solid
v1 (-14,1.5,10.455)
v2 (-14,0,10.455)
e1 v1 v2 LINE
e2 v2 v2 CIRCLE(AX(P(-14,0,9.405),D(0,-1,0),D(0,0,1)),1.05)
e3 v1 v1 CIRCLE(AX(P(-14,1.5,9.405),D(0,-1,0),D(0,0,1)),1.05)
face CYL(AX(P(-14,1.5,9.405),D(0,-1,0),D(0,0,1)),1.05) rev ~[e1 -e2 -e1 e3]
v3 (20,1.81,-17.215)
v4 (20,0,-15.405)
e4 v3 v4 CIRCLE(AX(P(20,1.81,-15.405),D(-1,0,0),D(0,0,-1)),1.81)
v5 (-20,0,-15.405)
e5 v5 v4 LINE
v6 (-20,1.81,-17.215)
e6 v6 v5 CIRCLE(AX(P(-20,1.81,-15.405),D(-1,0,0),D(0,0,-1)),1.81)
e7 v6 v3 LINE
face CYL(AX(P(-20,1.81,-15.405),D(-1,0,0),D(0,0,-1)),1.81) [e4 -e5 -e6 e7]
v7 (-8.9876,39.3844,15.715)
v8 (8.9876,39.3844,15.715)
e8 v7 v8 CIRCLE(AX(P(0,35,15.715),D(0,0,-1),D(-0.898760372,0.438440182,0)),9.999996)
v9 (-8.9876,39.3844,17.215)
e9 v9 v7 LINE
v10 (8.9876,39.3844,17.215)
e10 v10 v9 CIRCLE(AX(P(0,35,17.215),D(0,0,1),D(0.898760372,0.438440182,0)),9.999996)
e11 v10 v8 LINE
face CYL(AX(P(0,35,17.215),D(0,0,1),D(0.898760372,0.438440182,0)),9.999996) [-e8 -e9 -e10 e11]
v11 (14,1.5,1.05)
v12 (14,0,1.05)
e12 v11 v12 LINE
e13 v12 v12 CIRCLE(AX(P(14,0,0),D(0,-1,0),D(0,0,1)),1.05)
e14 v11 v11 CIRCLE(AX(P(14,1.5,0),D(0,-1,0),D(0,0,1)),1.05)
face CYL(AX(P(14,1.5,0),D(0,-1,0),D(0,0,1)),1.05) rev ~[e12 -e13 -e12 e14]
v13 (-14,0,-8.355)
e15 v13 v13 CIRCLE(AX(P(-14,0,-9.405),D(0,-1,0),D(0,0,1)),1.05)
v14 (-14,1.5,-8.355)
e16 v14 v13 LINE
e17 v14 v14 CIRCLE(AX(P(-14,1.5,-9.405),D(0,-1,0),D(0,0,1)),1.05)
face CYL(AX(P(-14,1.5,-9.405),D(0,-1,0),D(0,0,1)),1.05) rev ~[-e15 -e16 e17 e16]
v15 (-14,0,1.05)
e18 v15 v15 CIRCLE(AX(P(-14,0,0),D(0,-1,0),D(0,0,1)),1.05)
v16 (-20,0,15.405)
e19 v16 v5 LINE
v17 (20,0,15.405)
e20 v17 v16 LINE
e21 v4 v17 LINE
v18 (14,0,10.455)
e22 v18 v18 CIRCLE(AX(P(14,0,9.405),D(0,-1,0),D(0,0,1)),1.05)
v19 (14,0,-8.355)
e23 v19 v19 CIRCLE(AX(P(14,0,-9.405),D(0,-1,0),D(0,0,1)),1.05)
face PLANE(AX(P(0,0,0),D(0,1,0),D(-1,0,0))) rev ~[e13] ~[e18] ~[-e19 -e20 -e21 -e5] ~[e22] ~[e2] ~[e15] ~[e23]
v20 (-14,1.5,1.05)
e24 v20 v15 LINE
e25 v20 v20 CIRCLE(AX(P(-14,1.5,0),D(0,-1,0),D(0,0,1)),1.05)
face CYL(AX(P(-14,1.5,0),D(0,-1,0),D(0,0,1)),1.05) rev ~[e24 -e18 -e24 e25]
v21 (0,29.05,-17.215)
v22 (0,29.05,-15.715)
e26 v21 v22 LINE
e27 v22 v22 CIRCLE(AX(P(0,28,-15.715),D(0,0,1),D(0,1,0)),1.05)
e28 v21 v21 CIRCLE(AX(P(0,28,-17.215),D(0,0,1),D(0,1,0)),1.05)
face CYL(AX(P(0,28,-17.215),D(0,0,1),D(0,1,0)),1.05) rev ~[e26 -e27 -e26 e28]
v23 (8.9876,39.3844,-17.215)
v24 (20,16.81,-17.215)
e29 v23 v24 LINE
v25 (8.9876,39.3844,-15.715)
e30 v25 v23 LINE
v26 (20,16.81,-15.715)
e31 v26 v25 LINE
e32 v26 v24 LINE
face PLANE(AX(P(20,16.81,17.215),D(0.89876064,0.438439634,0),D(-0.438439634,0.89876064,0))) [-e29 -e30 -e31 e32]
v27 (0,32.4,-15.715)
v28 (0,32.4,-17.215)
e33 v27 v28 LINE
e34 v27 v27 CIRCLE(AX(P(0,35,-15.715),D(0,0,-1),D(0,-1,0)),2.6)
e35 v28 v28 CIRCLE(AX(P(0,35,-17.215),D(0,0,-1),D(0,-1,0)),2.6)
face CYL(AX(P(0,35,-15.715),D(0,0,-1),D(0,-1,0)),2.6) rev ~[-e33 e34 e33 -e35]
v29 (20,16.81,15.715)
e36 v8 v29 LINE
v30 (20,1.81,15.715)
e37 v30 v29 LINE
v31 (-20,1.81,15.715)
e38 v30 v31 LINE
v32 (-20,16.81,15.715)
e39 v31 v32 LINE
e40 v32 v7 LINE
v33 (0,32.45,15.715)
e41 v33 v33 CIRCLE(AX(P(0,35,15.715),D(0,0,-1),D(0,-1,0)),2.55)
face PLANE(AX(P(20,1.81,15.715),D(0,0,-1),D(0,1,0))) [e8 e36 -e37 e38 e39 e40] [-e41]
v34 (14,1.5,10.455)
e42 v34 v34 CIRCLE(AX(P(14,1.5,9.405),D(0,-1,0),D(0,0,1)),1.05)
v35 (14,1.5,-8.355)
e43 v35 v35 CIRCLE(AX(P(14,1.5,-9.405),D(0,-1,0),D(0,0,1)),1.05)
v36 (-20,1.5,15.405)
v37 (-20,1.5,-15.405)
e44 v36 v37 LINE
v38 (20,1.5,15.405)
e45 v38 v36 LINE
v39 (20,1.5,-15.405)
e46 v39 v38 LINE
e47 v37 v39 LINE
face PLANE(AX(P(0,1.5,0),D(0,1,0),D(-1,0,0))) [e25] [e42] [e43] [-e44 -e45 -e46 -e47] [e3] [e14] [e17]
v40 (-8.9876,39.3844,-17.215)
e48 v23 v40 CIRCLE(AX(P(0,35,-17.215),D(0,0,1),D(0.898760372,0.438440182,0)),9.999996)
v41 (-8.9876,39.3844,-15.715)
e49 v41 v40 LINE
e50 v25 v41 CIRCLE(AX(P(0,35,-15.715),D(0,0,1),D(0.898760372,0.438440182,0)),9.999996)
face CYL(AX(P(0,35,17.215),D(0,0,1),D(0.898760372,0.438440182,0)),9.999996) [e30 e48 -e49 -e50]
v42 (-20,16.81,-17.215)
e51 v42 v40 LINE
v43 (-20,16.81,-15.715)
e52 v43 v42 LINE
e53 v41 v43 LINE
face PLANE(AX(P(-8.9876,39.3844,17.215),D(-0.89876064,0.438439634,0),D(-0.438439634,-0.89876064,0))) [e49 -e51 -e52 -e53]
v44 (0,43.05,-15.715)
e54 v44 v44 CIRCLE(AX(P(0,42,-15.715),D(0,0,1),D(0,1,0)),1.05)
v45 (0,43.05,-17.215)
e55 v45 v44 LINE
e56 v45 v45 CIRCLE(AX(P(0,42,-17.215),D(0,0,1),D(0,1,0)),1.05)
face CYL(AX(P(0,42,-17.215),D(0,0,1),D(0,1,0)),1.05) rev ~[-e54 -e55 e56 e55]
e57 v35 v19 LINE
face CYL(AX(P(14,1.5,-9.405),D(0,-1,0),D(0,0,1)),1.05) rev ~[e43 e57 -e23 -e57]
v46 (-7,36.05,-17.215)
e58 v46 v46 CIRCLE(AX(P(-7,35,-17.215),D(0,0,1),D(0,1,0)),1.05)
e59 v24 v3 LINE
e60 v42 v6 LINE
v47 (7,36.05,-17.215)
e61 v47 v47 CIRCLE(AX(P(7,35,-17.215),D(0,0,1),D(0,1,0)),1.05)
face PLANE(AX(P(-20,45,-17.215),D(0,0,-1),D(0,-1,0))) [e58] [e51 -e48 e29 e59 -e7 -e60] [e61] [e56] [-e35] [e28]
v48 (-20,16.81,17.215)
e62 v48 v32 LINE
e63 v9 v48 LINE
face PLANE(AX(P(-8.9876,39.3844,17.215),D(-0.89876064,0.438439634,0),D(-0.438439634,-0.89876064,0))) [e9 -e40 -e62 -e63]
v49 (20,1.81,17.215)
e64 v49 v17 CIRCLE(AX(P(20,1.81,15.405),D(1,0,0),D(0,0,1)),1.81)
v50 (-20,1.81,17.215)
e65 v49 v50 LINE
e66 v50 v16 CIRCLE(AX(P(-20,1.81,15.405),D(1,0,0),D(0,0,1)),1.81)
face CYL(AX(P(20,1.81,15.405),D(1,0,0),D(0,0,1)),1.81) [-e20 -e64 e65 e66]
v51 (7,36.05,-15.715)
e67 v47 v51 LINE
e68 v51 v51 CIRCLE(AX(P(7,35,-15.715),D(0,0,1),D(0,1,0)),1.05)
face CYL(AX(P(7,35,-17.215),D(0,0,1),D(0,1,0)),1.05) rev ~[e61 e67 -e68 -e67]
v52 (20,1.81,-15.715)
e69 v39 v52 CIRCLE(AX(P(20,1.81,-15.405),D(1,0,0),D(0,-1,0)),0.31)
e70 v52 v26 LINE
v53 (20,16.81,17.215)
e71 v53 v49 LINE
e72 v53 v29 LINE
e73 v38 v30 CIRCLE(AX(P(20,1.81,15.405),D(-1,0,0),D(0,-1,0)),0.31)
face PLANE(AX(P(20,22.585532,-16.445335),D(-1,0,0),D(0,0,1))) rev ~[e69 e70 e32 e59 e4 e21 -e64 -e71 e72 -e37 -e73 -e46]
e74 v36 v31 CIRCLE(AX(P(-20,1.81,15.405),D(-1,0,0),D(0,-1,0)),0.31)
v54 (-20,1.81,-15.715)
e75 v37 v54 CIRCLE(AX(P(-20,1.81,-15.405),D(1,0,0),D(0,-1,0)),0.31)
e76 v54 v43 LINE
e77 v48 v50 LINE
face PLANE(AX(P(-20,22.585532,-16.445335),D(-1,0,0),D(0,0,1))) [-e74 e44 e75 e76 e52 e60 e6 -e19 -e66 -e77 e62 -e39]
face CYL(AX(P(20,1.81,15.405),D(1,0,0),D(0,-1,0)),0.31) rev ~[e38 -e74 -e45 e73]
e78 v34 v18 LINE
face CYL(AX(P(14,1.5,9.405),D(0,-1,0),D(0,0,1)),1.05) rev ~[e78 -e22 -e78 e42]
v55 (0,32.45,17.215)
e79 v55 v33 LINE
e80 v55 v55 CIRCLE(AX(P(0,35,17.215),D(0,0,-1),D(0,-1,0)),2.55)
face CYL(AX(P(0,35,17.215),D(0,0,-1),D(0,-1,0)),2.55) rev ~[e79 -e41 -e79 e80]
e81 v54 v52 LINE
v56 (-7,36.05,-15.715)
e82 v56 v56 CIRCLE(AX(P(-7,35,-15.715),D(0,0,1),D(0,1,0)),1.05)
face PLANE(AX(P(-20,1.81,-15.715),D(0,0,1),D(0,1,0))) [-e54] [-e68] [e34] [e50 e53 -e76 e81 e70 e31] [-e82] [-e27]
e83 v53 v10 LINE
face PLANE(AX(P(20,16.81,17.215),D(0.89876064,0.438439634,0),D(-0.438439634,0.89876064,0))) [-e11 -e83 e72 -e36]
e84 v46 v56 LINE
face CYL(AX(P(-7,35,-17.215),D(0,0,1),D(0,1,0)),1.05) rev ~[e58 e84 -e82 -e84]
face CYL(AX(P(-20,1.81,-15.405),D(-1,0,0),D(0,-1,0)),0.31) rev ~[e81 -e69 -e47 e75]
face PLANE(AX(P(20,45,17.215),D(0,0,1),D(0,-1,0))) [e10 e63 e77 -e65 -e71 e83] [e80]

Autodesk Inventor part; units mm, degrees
ref_plane "YZ Plane" through (0, 0, 0) normal (1, 0, 0) x (0, 1, 0)
ref_plane "XZ Plane" through (0, 0, 0) normal (0, 1, 0) x (-1, 0, 0)
ref_plane "XY Plane" through (0, 0, 0) normal (0, 0, 1) x (1, 0, 0)
sketch "Sketch1" plane through (0, 0, 0) normal (0, 1, 0) x (-1, 0, 0)
  line L0 (20, -15.715) -> (-20, -15.715)
  line L1 (-20, -15.715) -> (-20, 15.715)
  line L2 (-20, 15.715) -> (20, 15.715)
  line L3 (20, 15.715) -> (20, -15.715)
  point P0 (0, 0)
  dimension "d0" = 40
  dimension "d1" = 20
  dimension "d2" = 31.43
  dimension "d3" = 15.715
extrude "Plate1" add sketch "Sketch1" along normal blind 1.5
sketch "Sketch2" plane through (20, 0, 17.215) normal (0, 0, -1) x (-1, 0, 0)
  line L0 (40, 0) -> (0, 0)
  line L1 (0, 0) -> (0, 45)
  line L2 (0, 45) -> (40, 45)
  line L3 (40, 45) -> (40, 0)
edge flange "Flange1" height 45 angle 90 thickness 1.5 bend radius 0.31 thickness toward (0, 0, -1) relief tear relief width 1.5 relief depth 0.75 edges at (0, 1.5, 15.715) wall of the first edge with corners at (-20, 0, 17.215) (20, 0, 17.215) (20, 45, 17.215) (-20, 45, 17.215)
bend "Bend1"
corner "Corner1"
sketch "Sketch3" plane through (-20, 0, -17.215) normal (0, 0, 1) x (1, 0, 0)
  line L0 (40, 0) -> (0, 0)
  line L1 (0, 0) -> (0, 45)
  line L2 (0, 45) -> (40, 45)
  line L3 (40, 45) -> (40, 0)
edge flange "Flange2" height 45 angle 90 thickness 1.5 bend radius 0.31 thickness toward (0, 0, 1) relief tear relief width 1.5 relief depth 0.75 edges at (0, 1.5, -15.715) wall of the first edge with corners at (20, 0, -17.215) (-20, 0, -17.215) (-20, 45, -17.215) (20, 45, -17.215)
bend "Bend2"
corner "Corner2"
sketch "Sketch4" plane through (-20, 45, 17.215) normal (0, 0, 1) x (1, 0, 0)
  line L0 (0, -43.19) -> (0, 0) projected
  line L1 (0, 0) -> (40, 0) projected
  line L2 (40, 0) -> (40, -43.19) projected
  line L3 (0, -43.19) -> (40, -43.19) projected
  arc A0 (28.9876, -5.6156) -> (11.0124, -5.6156) centre (20, -10) ccw
  line L4 (0, -38.19) -> (40, -38.19)
  line L5 (40, -38.19) -> (40, -28.19)
  line L6 (40, -28.19) -> (0, -28.19)
  line L7 (0, -28.19) -> (0, -38.19)
  line L8 (40, -28.19) -> (28.9876, -5.6156)
  line L9 (11.0124, -5.6156) -> (0, -28.19)
  point P0 (0, -28.19)
  point P1 (20, 0)
  point P2 (40, -28.19)
  dimension "d50" = 10
  dimension "d51" = 20
  dimension "d52" = 20
  dimension "d53" = 38.19
  dimension "d54" = 10
  dimension "d55" = 40
  dimension "d56" = 40
extrude "Extrusion1" cut sketch "Sketch4" against normal blind 50 contours L0 L1 A0 L9 | L8 A0 L1 L2
sketch "Sketch6" plane through (-20, 1.81, 17.215) normal (0, 0, 1) x (1, 0, 0)
  arc A0 (28.9876, 37.5744) -> (11.0124, 37.5744) centre (20, 33.19) ccw projected
  point P0 (20, -1.81)
hole "Hole2" at (0, 35, 17.215) direction (0, 0, -1) diameter 5.1 depth 1.5 clearance for "Hex Head Bolt" size "M5" standard "Ansi Metric M Profile"
sketch "Sketch7" plane through (-20, 1.81, -15.715) normal (0, 0, 1) x (1, 0, 0)
  arc A0 (28.9876, 37.5744) -> (11.0124, 37.5744) centre (20, 33.19) ccw projected
  point P0 (20, -1.81)
hole "Hole3" at (0, 35, -15.715) direction (0, 0, -1) diameter 5.2 depth 1.5 clearance for "Hex Head Bolt" size "M5" standard "Ansi Metric M Profile"
sketch "Sketch8" plane through (0, 1.5, 0) normal (0, 1, 0) x (1, 0, 0)
  line L0 (20, 15.405) -> (20, -15.405) projected
  line L1 (20, -15.715) -> (-20, -15.715) projected
  line L2 (-20, -15.405) -> (20, -15.405) projected
  line L3 (20, 15.405) -> (-20, 15.405) projected
  point P0 (0, 0)
  point P1 (14, -9.405)
  point P2 (-14, -9.405)
  point P3 (14, 0)
  point P4 (-14, 0)
  point P5 (14, 9.405)
  point P6 (-14, 9.405)
  dimension "d71" = 6
  dimension "d73" = 6
  dimension "d76" = 28
  dimension "d79" = 9.405
hole "Hole4" at (14, 1.5, 9.405) at (-14, 1.5, 9.405) at (14, 1.5, 0) at (-14, 1.5, 0) at (14, 1.5, -9.405) at (-14, 1.5, -9.405) direction (0, -1, 0) diameter 2.1 depth 1.5
sketch "Sketch9" plane through (20, 1.81, -17.215) normal (0, 0, -1) x (-1, 0, 0)
  arc A0 (28.9876, 37.5744) -> (11.0124, 37.5744) centre (20, 33.19) ccw projected
  circle A1 centre (20, 40.19) radius 1.05
  circle A2 centre (13, 33.19) radius 1.05
  circle A3 centre (20, 26.19) radius 1.05
  circle A4 centre (27, 33.19) radius 1.05
  point P0 (20, -1.81)
  dimension "d89" = 7
  dimension "d90" = 0
  dimension "d91" = 2.1
  dimension "d94" = 360
hole "Hole5" at (0, 28, -17.215) at (7, 35, -17.215) at (-7, 35, -17.215) at (0, 42, -17.215) direction (0, 0, 1) diameter 2.1 depth 1.5
equation "\"d62\" = Thickness"
equation "\"d69\" = Thickness"
equation "\"d87\" = Thickness"
equation "\"d101\" = Thickness"
equation "\"d4\" = Thickness"
equation "\"d5\" = BendReliefWidth"
equation "\"d6\" = BendReliefDepth"
equation "\"d7\" = MinimumRemnant"
equation "\"d8\" = TransitionRadius"
equation "\"d11\" = BendRadius"
equation "\"d12\" = CornerReliefSize"
equation "\"d13\" = GapSize"
equation "\"d14\" = JacobiRadiusSize"
equation "\"d15\" = BendReliefWidth"
equation "\"d16\" = BendReliefDepth"
equation "\"d17\" = MinimumRemnant"
equation "\"d18\" = TransitionRadius"
equation "\"d21\" = BendRadius"
equation "\"d22\" = CornerReliefSize"
equation "\"d23\" = GapSize"
equation "\"d24\" = JacobiRadiusSize"
equation "\"BendReliefWidth\" = Thickness"
equation "\"BendReliefDepth\" = 0.5 * Thickness"
equation "\"CornerReliefSize\" = 4 * Thickness"
equation "\"MinimumRemnant\" = 2 * Thickness"
equation "\"TransitionRadius\" = BendRadius"
equation "\"JacobiRadiusSize\" = BendRadius"
equation "\"GapSize\" = Thickness"
equation "\"Thickness\" = 1.5"
equation "\"BendRadius\" = 0.31"
properties part number "axis_12_bottom_frame(top)" material "Aluminum 6061-AHC"
